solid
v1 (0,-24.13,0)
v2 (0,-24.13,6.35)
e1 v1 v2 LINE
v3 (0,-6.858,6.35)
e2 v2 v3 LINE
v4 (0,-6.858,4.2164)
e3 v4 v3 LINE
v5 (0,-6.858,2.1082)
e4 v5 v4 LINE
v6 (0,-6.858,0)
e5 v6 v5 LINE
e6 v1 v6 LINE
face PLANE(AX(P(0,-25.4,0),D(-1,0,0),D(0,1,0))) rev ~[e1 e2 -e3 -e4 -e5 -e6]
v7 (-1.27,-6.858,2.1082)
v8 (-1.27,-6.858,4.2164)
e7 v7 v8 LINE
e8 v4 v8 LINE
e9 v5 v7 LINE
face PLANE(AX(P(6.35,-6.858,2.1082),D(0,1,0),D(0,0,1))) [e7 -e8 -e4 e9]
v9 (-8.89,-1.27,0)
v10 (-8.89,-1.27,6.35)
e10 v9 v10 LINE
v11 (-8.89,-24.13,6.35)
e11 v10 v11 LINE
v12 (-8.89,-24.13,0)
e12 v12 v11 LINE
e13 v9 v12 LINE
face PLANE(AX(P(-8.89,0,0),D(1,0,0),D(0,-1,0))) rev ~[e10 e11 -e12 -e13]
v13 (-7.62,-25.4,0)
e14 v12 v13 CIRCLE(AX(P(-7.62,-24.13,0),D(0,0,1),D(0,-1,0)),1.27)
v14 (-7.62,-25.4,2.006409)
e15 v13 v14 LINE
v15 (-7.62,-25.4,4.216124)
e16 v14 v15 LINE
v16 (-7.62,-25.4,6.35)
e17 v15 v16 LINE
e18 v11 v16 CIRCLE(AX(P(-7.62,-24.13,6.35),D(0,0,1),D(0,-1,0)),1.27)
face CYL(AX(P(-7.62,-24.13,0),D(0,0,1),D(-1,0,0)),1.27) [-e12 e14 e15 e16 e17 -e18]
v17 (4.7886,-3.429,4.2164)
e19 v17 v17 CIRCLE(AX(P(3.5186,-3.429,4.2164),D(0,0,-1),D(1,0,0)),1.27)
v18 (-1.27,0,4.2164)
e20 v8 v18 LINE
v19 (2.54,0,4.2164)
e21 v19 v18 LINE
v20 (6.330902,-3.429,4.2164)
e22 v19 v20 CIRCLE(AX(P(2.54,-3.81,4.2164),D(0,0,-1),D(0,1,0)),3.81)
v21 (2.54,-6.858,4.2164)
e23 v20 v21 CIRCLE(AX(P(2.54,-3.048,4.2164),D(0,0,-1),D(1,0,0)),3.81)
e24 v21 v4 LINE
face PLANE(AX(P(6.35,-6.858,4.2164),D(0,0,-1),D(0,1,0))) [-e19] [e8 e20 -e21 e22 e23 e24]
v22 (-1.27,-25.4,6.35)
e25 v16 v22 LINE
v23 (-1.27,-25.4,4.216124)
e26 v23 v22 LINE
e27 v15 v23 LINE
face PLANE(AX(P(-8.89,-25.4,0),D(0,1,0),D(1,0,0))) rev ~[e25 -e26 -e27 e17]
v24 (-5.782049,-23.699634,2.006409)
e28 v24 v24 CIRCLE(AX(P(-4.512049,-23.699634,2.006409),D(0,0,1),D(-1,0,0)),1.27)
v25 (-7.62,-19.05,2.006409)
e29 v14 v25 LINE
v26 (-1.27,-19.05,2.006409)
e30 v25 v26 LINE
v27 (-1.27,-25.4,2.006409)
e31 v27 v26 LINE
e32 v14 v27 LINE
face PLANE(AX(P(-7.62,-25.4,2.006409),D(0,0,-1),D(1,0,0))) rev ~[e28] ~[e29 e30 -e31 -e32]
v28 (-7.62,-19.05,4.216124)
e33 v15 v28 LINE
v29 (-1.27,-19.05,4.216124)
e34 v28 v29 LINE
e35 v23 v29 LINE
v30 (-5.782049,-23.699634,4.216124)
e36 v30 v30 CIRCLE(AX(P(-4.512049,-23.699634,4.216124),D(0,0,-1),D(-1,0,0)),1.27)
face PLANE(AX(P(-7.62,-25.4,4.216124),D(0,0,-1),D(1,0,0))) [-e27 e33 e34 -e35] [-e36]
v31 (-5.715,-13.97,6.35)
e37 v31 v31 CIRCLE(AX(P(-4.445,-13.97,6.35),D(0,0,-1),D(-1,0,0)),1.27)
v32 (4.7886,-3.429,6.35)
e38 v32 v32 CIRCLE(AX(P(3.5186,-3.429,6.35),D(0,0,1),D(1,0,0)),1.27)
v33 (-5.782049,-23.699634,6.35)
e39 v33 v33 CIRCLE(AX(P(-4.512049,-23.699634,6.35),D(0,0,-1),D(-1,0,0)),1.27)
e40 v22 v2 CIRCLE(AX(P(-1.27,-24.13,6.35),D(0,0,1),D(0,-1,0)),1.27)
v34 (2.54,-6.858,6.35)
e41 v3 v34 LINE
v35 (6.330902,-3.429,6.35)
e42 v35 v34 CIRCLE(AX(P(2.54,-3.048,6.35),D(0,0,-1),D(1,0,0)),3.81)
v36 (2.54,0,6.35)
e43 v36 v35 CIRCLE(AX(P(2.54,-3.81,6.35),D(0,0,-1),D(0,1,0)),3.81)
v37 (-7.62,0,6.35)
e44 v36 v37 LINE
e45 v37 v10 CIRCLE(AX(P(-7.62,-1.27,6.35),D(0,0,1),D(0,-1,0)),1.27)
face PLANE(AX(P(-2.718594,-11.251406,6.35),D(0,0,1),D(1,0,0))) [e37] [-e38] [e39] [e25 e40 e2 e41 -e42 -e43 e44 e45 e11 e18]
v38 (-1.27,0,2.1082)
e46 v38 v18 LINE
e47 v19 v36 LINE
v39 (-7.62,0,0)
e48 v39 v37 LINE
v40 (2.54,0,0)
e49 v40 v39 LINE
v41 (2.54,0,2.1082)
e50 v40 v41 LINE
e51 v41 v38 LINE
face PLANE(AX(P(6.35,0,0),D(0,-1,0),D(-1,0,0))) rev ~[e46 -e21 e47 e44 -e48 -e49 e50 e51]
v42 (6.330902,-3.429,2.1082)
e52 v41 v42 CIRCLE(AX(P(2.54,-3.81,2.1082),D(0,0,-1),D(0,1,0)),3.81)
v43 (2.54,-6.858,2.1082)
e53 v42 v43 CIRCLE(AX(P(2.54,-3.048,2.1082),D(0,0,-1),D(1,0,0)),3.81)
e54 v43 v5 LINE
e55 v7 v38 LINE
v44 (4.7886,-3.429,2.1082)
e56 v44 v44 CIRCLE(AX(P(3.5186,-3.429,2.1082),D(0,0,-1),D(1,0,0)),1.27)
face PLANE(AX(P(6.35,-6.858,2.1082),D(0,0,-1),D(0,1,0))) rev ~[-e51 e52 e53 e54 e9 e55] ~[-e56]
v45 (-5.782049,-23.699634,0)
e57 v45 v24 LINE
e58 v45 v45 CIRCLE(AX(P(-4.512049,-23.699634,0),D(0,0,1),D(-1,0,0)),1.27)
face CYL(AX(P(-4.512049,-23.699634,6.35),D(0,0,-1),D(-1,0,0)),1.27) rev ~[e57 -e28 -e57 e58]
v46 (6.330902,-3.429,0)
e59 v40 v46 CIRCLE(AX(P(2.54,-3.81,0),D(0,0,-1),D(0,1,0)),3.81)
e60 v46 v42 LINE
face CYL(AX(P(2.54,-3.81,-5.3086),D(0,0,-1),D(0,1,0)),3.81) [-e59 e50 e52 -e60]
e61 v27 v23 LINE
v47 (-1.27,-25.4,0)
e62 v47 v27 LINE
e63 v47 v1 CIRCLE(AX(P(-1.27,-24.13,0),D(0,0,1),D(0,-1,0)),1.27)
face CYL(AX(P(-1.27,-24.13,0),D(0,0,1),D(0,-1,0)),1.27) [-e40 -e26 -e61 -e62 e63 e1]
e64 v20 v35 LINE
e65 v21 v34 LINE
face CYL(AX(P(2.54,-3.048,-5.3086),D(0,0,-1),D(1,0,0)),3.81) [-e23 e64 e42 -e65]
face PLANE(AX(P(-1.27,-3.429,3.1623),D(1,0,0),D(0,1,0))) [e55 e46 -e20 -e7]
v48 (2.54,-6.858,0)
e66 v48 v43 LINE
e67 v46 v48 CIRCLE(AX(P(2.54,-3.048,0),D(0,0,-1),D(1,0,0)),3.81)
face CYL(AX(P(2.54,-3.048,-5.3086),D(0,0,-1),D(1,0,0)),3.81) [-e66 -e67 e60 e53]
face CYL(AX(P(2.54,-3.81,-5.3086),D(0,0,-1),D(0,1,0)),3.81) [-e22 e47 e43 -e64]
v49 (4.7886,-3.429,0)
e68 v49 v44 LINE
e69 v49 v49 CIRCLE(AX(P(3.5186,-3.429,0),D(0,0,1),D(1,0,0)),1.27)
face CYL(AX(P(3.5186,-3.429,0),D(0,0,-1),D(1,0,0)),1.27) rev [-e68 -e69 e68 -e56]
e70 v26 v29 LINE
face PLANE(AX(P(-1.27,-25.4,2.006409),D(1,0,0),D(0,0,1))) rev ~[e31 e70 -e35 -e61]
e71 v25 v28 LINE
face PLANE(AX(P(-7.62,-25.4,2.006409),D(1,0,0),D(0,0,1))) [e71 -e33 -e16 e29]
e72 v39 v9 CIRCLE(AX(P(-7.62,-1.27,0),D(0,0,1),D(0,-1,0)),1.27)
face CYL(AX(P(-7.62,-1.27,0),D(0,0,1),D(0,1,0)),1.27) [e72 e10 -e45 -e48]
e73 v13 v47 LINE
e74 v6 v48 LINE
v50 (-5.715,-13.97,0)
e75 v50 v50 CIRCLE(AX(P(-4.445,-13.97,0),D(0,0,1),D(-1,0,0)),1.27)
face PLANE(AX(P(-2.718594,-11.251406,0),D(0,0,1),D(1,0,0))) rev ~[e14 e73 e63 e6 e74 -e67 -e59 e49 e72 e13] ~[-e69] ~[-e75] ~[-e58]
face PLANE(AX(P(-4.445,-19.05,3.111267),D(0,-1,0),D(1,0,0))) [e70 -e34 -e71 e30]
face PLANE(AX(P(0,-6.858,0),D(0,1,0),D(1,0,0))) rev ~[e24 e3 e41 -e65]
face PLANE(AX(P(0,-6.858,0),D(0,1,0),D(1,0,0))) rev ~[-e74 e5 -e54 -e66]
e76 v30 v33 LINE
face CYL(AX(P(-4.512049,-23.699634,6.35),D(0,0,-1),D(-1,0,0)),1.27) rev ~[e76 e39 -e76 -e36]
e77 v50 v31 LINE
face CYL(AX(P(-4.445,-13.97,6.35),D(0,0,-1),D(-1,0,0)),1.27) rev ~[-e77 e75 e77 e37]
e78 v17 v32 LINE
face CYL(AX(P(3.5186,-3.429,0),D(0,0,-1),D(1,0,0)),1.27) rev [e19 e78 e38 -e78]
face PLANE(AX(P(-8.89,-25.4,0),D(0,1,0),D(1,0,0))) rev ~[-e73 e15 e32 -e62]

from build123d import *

# Parameters (mm, degrees)
F0_R            = 1.27
F1_DEPTH        = 6.35
F3_W            = 6.858
F3_H            = 2.1082
F4_DEPTH        = 7.62
F5_R            = 1.27
F6_W            = 6.35
F6_H            = 2.2097155452
F7_DEPTH        = 6.35
F9_D            = 2.54
F9_CBORE_D      = 2.54
F9_CBORE_DEPTH  = 6.35
F11_D           = 2.54
F11_CBORE_D     = 2.54
F11_CBORE_DEPTH = 6.35
F12_T1_DEPTH    = 21.1836
F12_T3_DEPTH    = 21.1582


# Not quite as in the source:
# - a fillet or chamfer that OpenCascade refuses, or shapes differently, is made with other operations: its cross-section is extruded or revolved along the edge and cut away or added


with BuildPart() as f1:
    # F0 (on Top) → F1 (new body)
    with BuildSketch(Plane.XY):
        Polygon((6.35, 0), (0, 0), (-8.89, 0), (-8.89, -6.858), (-8.89, -25.4), (0, -25.4), (0, -6.858), (6.35, -6.858), align=None)
        with Locations((3.5186004825, -3.429)):
            Circle(F0_R, mode=Mode.SUBTRACT)
    extrude(amount=F1_DEPTH)

    # F3 (on face) → F4 (cut)
    with BuildSketch(Plane.YZ.offset(6.35)):
        with Locations((-3.429, 3.1623)):
            Rectangle(F3_W, F3_H)
    extrude(amount=-F4_DEPTH, mode=Mode.SUBTRACT)

    # F5
    f5_edges = [f1.edges().sort_by_distance(p)[0] for p in [
        (0, -25.4, 3.175),
        (-8.89, -25.4, 3.175),
        (-8.89, 0, 3.175),
    ]]
    fillet(f5_edges, radius=F5_R)

    # F6 (on face) → F7 (cut)
    with BuildSketch(Plane.XZ.offset(25.4)):
        with Locations((-4.445, 3.1112665311)):
            Rectangle(F6_W, F6_H)
    extrude(amount=-F7_DEPTH, mode=Mode.SUBTRACT)

    # F9 (through all)
    with Locations(Plane.XY.offset(6.35)):
        with Locations((-4.5120492578, -23.6996337771)):
            CounterBoreHole(F9_D / 2, F9_CBORE_D / 2, F9_CBORE_DEPTH)

    # F11 (through all)
    with Locations(Plane.XY.offset(6.35)):
        with Locations((-4.445, -13.97)):
            CounterBoreHole(F11_D / 2, F11_CBORE_D / 2, F11_CBORE_DEPTH)

    # F12: fillet of radius 3.81 on 4 edges, made by hand

    # F12_s2 → F12_t1 (cut)
    with BuildSketch(Plane.XY.offset(-5.3086)):
        with BuildLine():
            ThreePointArc((6.35, -3.048), (5.2340768363, -5.7420768363), (2.54, -6.858))
            Line((2.54, -6.858), (6.35, -6.858))
            Line((6.35, -6.858), (6.35, -3.048))
        make_face()
        with BuildLine():
            ThreePointArc((2.54, 0), (5.2340768363, -1.1159231637), (6.35, -3.81))
            Line((6.35, -3.81), (6.35, 0))
            Line((6.35, 0), (2.54, 0))
        make_face()
    extrude(amount=F12_T1_DEPTH, mode=Mode.SUBTRACT)

    # F12_s4 → F12_t3 (cut)
    with BuildSketch(Plane.XY.offset(-9.525)):
        with BuildLine():
            ThreePointArc((6.35, -3.048), (5.2340768363, -5.7420768363), (2.54, -6.858))
            Line((2.54, -6.858), (6.35, -6.858))
            Line((6.35, -6.858), (6.35, -3.048))
        make_face()
        with BuildLine():
            ThreePointArc((2.54, 0), (5.2340768363, -1.1159231637), (6.35, -3.81))
            Line((6.35, -3.81), (6.35, 0))
            Line((6.35, 0), (2.54, 0))
        make_face()
    extrude(amount=F12_T3_DEPTH, mode=Mode.SUBTRACT)


solid = f1.part
